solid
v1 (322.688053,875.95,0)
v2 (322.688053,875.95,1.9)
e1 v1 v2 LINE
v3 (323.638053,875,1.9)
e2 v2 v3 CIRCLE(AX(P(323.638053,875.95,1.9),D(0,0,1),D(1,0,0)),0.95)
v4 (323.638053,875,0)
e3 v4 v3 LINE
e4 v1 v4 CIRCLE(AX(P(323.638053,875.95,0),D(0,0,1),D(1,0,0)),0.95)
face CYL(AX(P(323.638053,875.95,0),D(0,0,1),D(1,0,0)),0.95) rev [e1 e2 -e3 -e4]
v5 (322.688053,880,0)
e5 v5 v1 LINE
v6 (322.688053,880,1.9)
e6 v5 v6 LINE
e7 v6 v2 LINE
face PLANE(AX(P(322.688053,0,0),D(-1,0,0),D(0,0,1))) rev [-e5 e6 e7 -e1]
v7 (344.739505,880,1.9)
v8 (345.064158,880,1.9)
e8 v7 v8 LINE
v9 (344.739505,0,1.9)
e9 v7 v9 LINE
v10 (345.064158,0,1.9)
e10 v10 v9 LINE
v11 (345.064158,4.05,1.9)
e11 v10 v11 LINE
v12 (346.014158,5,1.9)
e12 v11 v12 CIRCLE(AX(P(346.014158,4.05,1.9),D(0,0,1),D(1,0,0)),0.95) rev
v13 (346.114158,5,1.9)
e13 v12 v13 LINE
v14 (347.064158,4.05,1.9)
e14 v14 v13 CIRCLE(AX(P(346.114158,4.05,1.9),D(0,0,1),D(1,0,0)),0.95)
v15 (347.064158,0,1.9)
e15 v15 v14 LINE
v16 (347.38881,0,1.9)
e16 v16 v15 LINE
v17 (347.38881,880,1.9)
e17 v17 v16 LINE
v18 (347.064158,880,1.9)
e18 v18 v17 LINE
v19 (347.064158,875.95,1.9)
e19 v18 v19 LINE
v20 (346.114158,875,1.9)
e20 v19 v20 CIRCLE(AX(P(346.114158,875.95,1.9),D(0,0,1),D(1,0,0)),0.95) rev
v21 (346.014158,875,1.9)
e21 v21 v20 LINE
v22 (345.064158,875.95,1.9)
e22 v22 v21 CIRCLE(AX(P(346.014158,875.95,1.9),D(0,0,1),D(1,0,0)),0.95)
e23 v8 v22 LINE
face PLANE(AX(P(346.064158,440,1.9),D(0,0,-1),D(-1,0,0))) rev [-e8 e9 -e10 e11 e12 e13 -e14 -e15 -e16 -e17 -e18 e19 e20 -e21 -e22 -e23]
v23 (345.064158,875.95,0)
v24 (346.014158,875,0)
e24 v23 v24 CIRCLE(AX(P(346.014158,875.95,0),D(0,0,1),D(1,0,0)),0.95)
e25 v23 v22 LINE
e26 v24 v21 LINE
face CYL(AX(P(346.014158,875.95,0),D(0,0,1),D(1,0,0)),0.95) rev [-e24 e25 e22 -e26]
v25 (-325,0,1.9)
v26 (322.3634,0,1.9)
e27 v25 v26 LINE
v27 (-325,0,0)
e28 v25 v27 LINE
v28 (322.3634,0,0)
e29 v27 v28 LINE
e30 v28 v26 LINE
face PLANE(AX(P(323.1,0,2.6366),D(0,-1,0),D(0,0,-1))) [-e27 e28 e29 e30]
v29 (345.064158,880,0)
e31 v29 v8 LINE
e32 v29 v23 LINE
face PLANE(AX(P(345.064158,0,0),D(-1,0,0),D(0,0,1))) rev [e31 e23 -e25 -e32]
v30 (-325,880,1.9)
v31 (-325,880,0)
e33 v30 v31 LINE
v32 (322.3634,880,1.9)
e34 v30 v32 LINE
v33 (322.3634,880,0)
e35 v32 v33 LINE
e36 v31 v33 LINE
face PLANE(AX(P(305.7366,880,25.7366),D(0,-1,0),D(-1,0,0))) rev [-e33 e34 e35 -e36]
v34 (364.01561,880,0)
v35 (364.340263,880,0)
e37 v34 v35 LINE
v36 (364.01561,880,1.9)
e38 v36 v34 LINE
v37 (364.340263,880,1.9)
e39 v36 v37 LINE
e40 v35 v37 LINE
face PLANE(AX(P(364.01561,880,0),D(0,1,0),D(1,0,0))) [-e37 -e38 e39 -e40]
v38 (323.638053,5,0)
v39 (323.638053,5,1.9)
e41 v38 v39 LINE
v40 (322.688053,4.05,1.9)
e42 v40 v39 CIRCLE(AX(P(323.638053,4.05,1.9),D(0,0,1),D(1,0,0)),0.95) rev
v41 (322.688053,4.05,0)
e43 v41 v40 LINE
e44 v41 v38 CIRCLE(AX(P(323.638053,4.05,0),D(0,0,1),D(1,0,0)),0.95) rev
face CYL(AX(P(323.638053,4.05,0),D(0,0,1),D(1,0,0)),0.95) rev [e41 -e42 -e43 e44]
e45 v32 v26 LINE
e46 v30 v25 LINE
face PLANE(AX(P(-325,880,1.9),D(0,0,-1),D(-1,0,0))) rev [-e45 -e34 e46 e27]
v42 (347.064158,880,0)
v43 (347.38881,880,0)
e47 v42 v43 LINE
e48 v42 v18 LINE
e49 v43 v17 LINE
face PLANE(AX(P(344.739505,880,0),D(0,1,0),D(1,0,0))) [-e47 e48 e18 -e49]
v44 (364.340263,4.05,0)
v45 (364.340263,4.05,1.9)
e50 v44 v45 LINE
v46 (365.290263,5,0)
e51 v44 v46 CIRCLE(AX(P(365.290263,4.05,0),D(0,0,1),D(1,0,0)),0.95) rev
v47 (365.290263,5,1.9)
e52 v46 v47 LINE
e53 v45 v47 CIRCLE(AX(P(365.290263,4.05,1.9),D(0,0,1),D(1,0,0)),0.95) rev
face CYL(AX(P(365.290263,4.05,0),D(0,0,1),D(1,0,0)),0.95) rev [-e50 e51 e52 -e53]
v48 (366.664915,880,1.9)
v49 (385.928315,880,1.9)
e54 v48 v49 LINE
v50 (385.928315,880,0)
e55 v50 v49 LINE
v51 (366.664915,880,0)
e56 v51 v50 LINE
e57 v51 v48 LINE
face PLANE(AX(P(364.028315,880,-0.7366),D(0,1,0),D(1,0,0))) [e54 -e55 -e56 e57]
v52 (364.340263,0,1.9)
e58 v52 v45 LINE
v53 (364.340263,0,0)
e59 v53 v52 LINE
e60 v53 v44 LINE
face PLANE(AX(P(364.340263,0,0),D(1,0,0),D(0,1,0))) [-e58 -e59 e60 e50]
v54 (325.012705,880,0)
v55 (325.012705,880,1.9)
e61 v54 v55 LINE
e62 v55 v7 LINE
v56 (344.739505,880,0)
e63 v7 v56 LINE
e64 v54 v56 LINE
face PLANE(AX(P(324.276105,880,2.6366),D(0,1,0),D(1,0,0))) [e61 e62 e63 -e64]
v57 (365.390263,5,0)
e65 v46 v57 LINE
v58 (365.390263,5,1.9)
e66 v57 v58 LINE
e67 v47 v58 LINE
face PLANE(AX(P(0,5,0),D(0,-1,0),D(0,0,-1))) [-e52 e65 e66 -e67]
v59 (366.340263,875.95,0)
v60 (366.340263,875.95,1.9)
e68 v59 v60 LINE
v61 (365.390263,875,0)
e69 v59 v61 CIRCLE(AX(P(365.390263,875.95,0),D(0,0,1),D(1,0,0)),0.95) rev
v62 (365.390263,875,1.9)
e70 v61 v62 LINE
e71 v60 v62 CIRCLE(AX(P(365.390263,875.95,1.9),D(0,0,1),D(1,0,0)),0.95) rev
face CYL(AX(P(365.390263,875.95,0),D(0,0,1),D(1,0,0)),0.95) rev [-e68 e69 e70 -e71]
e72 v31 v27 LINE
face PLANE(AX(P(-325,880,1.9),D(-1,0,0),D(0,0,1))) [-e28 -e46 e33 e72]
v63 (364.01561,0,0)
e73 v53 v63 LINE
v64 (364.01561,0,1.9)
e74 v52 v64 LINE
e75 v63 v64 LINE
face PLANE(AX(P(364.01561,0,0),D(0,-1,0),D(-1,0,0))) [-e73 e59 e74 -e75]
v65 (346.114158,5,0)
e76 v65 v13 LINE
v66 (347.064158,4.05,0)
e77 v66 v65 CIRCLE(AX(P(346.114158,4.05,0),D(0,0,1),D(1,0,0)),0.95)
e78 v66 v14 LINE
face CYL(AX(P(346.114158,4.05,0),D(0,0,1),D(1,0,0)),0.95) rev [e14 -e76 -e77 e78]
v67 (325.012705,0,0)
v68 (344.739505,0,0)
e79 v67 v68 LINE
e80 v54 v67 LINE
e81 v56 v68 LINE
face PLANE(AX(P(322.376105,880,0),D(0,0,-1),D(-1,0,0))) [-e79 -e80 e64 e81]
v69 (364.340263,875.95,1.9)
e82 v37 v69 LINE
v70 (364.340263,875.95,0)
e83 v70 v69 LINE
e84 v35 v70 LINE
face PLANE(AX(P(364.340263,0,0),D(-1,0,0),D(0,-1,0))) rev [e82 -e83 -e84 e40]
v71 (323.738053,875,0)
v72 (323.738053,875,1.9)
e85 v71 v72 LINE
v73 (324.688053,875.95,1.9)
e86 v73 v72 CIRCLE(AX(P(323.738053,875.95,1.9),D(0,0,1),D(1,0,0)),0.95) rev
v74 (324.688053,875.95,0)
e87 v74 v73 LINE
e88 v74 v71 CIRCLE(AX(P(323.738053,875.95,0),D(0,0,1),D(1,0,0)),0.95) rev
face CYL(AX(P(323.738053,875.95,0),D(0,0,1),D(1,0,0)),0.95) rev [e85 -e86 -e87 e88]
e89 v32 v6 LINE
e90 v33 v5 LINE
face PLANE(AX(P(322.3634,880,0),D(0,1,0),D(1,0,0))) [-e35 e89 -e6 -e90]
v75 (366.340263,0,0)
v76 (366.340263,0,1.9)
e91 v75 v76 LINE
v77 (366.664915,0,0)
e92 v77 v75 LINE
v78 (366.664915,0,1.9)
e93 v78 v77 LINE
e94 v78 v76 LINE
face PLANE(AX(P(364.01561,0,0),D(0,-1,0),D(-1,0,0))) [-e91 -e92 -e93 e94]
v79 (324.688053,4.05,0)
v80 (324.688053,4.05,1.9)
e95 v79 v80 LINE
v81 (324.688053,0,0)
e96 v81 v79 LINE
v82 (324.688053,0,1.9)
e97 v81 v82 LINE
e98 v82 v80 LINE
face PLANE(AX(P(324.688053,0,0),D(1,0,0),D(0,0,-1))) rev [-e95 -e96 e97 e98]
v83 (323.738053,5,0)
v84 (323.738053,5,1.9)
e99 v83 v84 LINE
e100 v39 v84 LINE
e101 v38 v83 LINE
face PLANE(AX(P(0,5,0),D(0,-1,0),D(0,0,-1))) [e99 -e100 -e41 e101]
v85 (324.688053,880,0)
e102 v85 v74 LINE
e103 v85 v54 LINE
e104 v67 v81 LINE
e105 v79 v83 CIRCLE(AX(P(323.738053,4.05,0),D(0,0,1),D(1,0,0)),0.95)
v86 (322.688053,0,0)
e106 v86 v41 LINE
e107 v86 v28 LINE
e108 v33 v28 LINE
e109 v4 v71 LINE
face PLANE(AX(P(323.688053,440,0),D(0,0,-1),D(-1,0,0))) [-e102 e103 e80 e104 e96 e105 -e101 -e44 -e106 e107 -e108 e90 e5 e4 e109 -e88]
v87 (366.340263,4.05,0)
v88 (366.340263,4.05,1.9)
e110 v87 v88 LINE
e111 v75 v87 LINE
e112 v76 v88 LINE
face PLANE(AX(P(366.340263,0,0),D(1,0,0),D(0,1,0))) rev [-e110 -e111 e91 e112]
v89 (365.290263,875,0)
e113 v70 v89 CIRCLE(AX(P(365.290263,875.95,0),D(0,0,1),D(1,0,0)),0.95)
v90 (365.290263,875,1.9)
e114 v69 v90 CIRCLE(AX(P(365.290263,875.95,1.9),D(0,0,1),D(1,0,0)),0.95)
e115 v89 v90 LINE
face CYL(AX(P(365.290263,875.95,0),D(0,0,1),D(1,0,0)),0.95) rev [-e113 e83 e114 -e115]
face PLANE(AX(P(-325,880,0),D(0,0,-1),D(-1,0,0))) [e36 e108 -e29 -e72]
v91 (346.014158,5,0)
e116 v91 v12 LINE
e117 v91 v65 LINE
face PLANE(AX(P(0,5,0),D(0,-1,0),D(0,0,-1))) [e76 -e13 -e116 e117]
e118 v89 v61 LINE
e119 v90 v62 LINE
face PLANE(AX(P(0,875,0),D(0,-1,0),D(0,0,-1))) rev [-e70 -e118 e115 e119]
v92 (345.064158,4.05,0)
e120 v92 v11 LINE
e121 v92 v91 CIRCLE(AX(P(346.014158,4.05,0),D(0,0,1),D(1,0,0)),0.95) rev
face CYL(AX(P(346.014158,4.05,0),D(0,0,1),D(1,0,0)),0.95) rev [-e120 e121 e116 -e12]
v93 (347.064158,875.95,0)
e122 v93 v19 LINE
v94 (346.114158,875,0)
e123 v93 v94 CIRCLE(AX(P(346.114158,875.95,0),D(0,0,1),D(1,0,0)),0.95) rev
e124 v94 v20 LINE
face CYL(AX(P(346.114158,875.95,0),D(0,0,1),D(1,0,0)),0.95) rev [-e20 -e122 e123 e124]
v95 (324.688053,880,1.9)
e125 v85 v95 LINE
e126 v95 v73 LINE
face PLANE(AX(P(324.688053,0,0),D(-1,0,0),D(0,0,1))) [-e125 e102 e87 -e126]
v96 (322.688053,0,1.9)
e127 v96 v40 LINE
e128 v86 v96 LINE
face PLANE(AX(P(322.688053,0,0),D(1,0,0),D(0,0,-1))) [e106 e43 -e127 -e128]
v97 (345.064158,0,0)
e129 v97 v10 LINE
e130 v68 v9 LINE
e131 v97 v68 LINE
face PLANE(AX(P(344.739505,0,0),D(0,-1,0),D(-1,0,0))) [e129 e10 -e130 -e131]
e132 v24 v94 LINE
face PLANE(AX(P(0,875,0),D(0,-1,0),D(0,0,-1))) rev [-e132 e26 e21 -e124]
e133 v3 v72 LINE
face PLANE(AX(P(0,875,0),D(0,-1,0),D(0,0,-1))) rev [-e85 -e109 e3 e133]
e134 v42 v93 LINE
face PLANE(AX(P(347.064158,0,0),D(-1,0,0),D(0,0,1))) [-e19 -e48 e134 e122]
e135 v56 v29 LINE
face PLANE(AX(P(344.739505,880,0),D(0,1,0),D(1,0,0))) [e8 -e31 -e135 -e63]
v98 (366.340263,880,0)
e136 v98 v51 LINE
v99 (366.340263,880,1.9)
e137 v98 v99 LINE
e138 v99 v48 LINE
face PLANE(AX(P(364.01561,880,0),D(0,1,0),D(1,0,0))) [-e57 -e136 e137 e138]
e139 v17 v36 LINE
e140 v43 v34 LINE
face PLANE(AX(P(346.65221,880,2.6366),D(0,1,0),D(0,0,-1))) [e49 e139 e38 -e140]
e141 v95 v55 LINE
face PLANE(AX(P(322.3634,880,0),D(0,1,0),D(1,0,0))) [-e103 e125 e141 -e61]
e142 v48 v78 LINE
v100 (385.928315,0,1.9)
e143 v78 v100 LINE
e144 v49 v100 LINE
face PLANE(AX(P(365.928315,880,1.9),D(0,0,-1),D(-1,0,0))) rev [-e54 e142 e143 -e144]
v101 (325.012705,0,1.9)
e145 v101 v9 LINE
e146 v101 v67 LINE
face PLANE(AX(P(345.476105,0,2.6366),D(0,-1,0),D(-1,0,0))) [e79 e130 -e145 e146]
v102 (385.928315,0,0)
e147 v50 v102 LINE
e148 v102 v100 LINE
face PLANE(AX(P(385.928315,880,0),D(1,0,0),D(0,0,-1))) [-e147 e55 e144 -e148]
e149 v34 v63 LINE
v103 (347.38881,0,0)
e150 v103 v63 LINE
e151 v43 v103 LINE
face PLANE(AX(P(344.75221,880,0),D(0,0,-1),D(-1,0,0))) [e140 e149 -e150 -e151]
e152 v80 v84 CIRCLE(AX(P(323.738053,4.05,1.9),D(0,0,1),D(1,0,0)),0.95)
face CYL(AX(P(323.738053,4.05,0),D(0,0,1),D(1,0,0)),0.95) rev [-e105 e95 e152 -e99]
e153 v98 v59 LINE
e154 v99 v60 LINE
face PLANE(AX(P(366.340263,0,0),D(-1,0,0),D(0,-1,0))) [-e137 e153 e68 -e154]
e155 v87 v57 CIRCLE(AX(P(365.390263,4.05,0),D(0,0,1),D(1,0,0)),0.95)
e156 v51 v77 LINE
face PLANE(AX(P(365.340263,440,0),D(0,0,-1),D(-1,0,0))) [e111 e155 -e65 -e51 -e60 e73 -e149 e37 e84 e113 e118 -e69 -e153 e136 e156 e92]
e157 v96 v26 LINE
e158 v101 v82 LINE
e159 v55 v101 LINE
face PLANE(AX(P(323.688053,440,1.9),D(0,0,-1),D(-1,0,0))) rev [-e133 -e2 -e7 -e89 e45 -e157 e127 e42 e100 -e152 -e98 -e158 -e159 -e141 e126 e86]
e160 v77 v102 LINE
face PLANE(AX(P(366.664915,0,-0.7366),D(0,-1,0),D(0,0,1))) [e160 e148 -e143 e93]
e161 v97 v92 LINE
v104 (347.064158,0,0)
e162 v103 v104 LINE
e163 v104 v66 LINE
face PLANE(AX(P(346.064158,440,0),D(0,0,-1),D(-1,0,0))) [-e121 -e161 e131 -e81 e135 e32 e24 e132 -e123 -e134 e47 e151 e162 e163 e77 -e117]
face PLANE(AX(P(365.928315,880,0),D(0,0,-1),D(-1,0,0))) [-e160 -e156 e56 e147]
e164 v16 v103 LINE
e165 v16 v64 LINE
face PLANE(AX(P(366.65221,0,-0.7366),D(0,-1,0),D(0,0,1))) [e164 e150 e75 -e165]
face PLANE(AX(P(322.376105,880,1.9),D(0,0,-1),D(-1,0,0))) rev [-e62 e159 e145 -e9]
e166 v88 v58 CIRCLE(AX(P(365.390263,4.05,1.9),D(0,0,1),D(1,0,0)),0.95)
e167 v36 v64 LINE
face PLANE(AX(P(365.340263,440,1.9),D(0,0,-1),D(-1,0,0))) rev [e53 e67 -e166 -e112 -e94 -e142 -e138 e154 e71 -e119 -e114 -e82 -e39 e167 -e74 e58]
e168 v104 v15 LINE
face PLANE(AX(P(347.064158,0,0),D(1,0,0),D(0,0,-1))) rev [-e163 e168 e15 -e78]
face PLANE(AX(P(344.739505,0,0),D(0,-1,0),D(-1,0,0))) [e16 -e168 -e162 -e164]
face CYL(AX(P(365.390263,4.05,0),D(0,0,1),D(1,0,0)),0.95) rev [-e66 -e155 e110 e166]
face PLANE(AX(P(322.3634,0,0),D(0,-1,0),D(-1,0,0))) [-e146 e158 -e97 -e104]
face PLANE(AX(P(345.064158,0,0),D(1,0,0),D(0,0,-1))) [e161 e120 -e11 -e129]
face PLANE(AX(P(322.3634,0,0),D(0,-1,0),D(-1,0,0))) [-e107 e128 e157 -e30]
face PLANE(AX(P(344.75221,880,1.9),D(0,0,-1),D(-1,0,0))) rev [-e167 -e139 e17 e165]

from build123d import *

# Parameters (mm, degrees)
BRIDA_BASE2_DEPTH          = 880
DESDOBLAR1_DEPTH           = 880
DESDOBLAR1_2_DEPTH         = 880
CORTAR_EXTRUIR1_DEPTH      = 961.908046857
CORTAR_EXTRUIR1_DEPTH_BACK = 961.908046857


# Read off the part's stored shape, not the designer's step: Desdoblar1
# Sheet-metal steps are written as plain solids
with BuildPart() as part:
    # Croquis55 → Brida base2 (new body)
    with BuildSketch(Plane(origin=(0, 0, 0), x_dir=(1, 0, 0), z_dir=(0, 1, 0))):
        with BuildLine():
            Line((-325, 0), (322.3634, 0))
            ThreePointArc((322.3634, 0), (324.227757739, -0.772242261), (325, -2.6366))
            Line((325, -2.6366), (325, -22.3634))
            ThreePointArc((325, -22.3634), (324.227757739, -24.227757739), (322.3634, -25))
            Line((322.3634, -25), (305.7366, -25))
            ThreePointArc((305.7366, -25), (305.215745145, -25.215745145), (305, -25.7366))
            Line((305, -25.7366), (305, -45))
            Line((305, -45), (303.1, -45))
            Line((303.1, -45), (303.1, -25.7366))
            ThreePointArc((303.1, -25.7366), (303.872242261, -23.872242261), (305.7366, -23.1))
            Line((305.7366, -23.1), (322.3634, -23.1))
            ThreePointArc((322.3634, -23.1), (322.884254855, -22.884254855), (323.1, -22.3634))
            Line((323.1, -22.3634), (323.1, -2.6366))
            ThreePointArc((323.1, -2.6366), (322.884254855, -2.115745145), (322.3634, -1.9))
            Line((322.3634, -1.9), (-325, -1.9))
            Line((-325, -1.9), (-325, 0))
        make_face()
    extrude(amount=BRIDA_BASE2_DEPTH)

    # Desdoblar1 outline → Desdoblar1 (cut)
    with BuildSketch(Plane(origin=(0, 0, 0), x_dir=(1, 0, 0), z_dir=(0, 1, 0))):
        with BuildLine():
            ThreePointArc((325, -2.6366), (324.973622072, -2.264578098), (324.895016084, -1.9))
            Line((324.895016084, -1.9), (322.3634, -1.9))
            ThreePointArc((322.3634, -1.9), (322.884254855, -2.115745145), (323.1, -2.6366))
            Line((323.1, -2.6366), (323.1, -22.3634))
            ThreePointArc((323.1, -22.3634), (322.884254855, -22.884254855), (322.3634, -23.1))
            Line((322.3634, -23.1), (305.7366, -23.1))
            ThreePointArc((305.7366, -23.1), (303.872242261, -23.872242261), (303.1, -25.7366))
            Line((303.1, -25.7366), (303.1, -45))
            Line((303.1, -45), (305, -45))
            Line((305, -45), (305, -25.7366))
            ThreePointArc((305, -25.7366), (305.215745145, -25.215745145), (305.7366, -25))
            Line((305.7366, -25), (322.3634, -25))
            ThreePointArc((322.3634, -25), (324.227757739, -24.227757739), (325, -22.3634))
            Line((325, -22.3634), (325, -2.6366))
        make_face()
    extrude(amount=DESDOBLAR1_DEPTH, mode=Mode.SUBTRACT)

    # Desdoblar1 2 outline → Desdoblar1 2 (add)
    with BuildSketch(Plane(origin=(0, 0, 0), x_dir=(1, 0, 0), z_dir=(0, 1, 0))):
        with BuildLine():
            Line((385.928315254, 0), (322.3634, 0))
            ThreePointArc((322.3634, 0), (323.946046517, -0.527835063), (324.895016084, -1.9))
            Line((324.895016084, -1.9), (385.928315254, -1.9))
            Line((385.928315254, -1.9), (385.928315254, 0))
        make_face()
    extrude(amount=DESDOBLAR1_2_DEPTH)

    # Croquis64 → Cortar-Extruir1 (cut, two sides: drawn at the far end of the back side and taken through both)
    with BuildSketch(Plane.XY.offset(1.9).offset(-CORTAR_EXTRUIR1_DEPTH_BACK)):
        with BuildLine():
            Line((322.688052542, 0), (324.688052542, 0))
            Line((324.688052542, 0), (324.688052542, 4.05))
            ThreePointArc((324.688052542, 4.05), (324.409803985, 4.721751442), (323.738052542, 5))
            Line((323.738052542, 5), (323.638052542, 5))
            ThreePointArc((323.638052542, 5), (322.9663011, 4.721751442), (322.688052542, 4.05))
            Line((322.688052542, 4.05), (322.688052542, 0))
        make_face()
        with BuildLine():
            Line((345.064157627, 0), (347.064157627, 0))
            Line((347.064157627, 0), (347.064157627, 4.05))
            ThreePointArc((347.064157627, 4.05), (346.785909069, 4.721751442), (346.114157627, 5))
            Line((346.114157627, 5), (346.014157627, 5))
            ThreePointArc((346.014157627, 5), (345.342406185, 4.721751442), (345.064157627, 4.05))
            Line((345.064157627, 4.05), (345.064157627, 0))
        make_face()
        with BuildLine():
            Line((364.340262712, 0), (366.340262712, 0))
            Line((366.340262712, 0), (366.340262712, 4.05))
            ThreePointArc((366.340262712, 4.05), (366.062014154, 4.721751442), (365.390262712, 5))
            Line((365.390262712, 5), (365.290262712, 5))
            ThreePointArc((365.290262712, 5), (364.61851127, 4.721751442), (364.340262712, 4.05))
            Line((364.340262712, 4.05), (364.340262712, 0))
        make_face()
        with BuildLine():
            Line((364.340262712, 880), (364.340262712, 875.95))
            ThreePointArc((364.340262712, 875.95), (364.61851127, 875.278248558), (365.290262712, 875))
            Line((365.290262712, 875), (365.390262712, 875))
            ThreePointArc((365.390262712, 875), (366.062014154, 875.278248558), (366.340262712, 875.95))
            Line((366.340262712, 875.95), (366.340262712, 880))
            Line((366.340262712, 880), (364.340262712, 880))
        make_face()
        with BuildLine():
            Line((345.064157627, 880), (345.064157627, 875.95))
            ThreePointArc((345.064157627, 875.95), (345.342406185, 875.278248558), (346.014157627, 875))
            Line((346.014157627, 875), (346.114157627, 875))
            ThreePointArc((346.114157627, 875), (346.785909069, 875.278248558), (347.064157627, 875.95))
            Line((347.064157627, 875.95), (347.064157627, 880))
            Line((347.064157627, 880), (345.064157627, 880))
        make_face()
        with BuildLine():
            Line((322.688052542, 880), (322.688052542, 875.95))
            ThreePointArc((322.688052542, 875.95), (322.9663011, 875.278248558), (323.638052542, 875))
            Line((323.638052542, 875), (323.738052542, 875))
            ThreePointArc((323.738052542, 875), (324.409803985, 875.278248558), (324.688052542, 875.95))
            Line((324.688052542, 875.95), (324.688052542, 880))
            Line((324.688052542, 880), (322.688052542, 880))
        make_face()
    extrude(amount=CORTAR_EXTRUIR1_DEPTH + CORTAR_EXTRUIR1_DEPTH_BACK, mode=Mode.SUBTRACT)


solid = part.part
